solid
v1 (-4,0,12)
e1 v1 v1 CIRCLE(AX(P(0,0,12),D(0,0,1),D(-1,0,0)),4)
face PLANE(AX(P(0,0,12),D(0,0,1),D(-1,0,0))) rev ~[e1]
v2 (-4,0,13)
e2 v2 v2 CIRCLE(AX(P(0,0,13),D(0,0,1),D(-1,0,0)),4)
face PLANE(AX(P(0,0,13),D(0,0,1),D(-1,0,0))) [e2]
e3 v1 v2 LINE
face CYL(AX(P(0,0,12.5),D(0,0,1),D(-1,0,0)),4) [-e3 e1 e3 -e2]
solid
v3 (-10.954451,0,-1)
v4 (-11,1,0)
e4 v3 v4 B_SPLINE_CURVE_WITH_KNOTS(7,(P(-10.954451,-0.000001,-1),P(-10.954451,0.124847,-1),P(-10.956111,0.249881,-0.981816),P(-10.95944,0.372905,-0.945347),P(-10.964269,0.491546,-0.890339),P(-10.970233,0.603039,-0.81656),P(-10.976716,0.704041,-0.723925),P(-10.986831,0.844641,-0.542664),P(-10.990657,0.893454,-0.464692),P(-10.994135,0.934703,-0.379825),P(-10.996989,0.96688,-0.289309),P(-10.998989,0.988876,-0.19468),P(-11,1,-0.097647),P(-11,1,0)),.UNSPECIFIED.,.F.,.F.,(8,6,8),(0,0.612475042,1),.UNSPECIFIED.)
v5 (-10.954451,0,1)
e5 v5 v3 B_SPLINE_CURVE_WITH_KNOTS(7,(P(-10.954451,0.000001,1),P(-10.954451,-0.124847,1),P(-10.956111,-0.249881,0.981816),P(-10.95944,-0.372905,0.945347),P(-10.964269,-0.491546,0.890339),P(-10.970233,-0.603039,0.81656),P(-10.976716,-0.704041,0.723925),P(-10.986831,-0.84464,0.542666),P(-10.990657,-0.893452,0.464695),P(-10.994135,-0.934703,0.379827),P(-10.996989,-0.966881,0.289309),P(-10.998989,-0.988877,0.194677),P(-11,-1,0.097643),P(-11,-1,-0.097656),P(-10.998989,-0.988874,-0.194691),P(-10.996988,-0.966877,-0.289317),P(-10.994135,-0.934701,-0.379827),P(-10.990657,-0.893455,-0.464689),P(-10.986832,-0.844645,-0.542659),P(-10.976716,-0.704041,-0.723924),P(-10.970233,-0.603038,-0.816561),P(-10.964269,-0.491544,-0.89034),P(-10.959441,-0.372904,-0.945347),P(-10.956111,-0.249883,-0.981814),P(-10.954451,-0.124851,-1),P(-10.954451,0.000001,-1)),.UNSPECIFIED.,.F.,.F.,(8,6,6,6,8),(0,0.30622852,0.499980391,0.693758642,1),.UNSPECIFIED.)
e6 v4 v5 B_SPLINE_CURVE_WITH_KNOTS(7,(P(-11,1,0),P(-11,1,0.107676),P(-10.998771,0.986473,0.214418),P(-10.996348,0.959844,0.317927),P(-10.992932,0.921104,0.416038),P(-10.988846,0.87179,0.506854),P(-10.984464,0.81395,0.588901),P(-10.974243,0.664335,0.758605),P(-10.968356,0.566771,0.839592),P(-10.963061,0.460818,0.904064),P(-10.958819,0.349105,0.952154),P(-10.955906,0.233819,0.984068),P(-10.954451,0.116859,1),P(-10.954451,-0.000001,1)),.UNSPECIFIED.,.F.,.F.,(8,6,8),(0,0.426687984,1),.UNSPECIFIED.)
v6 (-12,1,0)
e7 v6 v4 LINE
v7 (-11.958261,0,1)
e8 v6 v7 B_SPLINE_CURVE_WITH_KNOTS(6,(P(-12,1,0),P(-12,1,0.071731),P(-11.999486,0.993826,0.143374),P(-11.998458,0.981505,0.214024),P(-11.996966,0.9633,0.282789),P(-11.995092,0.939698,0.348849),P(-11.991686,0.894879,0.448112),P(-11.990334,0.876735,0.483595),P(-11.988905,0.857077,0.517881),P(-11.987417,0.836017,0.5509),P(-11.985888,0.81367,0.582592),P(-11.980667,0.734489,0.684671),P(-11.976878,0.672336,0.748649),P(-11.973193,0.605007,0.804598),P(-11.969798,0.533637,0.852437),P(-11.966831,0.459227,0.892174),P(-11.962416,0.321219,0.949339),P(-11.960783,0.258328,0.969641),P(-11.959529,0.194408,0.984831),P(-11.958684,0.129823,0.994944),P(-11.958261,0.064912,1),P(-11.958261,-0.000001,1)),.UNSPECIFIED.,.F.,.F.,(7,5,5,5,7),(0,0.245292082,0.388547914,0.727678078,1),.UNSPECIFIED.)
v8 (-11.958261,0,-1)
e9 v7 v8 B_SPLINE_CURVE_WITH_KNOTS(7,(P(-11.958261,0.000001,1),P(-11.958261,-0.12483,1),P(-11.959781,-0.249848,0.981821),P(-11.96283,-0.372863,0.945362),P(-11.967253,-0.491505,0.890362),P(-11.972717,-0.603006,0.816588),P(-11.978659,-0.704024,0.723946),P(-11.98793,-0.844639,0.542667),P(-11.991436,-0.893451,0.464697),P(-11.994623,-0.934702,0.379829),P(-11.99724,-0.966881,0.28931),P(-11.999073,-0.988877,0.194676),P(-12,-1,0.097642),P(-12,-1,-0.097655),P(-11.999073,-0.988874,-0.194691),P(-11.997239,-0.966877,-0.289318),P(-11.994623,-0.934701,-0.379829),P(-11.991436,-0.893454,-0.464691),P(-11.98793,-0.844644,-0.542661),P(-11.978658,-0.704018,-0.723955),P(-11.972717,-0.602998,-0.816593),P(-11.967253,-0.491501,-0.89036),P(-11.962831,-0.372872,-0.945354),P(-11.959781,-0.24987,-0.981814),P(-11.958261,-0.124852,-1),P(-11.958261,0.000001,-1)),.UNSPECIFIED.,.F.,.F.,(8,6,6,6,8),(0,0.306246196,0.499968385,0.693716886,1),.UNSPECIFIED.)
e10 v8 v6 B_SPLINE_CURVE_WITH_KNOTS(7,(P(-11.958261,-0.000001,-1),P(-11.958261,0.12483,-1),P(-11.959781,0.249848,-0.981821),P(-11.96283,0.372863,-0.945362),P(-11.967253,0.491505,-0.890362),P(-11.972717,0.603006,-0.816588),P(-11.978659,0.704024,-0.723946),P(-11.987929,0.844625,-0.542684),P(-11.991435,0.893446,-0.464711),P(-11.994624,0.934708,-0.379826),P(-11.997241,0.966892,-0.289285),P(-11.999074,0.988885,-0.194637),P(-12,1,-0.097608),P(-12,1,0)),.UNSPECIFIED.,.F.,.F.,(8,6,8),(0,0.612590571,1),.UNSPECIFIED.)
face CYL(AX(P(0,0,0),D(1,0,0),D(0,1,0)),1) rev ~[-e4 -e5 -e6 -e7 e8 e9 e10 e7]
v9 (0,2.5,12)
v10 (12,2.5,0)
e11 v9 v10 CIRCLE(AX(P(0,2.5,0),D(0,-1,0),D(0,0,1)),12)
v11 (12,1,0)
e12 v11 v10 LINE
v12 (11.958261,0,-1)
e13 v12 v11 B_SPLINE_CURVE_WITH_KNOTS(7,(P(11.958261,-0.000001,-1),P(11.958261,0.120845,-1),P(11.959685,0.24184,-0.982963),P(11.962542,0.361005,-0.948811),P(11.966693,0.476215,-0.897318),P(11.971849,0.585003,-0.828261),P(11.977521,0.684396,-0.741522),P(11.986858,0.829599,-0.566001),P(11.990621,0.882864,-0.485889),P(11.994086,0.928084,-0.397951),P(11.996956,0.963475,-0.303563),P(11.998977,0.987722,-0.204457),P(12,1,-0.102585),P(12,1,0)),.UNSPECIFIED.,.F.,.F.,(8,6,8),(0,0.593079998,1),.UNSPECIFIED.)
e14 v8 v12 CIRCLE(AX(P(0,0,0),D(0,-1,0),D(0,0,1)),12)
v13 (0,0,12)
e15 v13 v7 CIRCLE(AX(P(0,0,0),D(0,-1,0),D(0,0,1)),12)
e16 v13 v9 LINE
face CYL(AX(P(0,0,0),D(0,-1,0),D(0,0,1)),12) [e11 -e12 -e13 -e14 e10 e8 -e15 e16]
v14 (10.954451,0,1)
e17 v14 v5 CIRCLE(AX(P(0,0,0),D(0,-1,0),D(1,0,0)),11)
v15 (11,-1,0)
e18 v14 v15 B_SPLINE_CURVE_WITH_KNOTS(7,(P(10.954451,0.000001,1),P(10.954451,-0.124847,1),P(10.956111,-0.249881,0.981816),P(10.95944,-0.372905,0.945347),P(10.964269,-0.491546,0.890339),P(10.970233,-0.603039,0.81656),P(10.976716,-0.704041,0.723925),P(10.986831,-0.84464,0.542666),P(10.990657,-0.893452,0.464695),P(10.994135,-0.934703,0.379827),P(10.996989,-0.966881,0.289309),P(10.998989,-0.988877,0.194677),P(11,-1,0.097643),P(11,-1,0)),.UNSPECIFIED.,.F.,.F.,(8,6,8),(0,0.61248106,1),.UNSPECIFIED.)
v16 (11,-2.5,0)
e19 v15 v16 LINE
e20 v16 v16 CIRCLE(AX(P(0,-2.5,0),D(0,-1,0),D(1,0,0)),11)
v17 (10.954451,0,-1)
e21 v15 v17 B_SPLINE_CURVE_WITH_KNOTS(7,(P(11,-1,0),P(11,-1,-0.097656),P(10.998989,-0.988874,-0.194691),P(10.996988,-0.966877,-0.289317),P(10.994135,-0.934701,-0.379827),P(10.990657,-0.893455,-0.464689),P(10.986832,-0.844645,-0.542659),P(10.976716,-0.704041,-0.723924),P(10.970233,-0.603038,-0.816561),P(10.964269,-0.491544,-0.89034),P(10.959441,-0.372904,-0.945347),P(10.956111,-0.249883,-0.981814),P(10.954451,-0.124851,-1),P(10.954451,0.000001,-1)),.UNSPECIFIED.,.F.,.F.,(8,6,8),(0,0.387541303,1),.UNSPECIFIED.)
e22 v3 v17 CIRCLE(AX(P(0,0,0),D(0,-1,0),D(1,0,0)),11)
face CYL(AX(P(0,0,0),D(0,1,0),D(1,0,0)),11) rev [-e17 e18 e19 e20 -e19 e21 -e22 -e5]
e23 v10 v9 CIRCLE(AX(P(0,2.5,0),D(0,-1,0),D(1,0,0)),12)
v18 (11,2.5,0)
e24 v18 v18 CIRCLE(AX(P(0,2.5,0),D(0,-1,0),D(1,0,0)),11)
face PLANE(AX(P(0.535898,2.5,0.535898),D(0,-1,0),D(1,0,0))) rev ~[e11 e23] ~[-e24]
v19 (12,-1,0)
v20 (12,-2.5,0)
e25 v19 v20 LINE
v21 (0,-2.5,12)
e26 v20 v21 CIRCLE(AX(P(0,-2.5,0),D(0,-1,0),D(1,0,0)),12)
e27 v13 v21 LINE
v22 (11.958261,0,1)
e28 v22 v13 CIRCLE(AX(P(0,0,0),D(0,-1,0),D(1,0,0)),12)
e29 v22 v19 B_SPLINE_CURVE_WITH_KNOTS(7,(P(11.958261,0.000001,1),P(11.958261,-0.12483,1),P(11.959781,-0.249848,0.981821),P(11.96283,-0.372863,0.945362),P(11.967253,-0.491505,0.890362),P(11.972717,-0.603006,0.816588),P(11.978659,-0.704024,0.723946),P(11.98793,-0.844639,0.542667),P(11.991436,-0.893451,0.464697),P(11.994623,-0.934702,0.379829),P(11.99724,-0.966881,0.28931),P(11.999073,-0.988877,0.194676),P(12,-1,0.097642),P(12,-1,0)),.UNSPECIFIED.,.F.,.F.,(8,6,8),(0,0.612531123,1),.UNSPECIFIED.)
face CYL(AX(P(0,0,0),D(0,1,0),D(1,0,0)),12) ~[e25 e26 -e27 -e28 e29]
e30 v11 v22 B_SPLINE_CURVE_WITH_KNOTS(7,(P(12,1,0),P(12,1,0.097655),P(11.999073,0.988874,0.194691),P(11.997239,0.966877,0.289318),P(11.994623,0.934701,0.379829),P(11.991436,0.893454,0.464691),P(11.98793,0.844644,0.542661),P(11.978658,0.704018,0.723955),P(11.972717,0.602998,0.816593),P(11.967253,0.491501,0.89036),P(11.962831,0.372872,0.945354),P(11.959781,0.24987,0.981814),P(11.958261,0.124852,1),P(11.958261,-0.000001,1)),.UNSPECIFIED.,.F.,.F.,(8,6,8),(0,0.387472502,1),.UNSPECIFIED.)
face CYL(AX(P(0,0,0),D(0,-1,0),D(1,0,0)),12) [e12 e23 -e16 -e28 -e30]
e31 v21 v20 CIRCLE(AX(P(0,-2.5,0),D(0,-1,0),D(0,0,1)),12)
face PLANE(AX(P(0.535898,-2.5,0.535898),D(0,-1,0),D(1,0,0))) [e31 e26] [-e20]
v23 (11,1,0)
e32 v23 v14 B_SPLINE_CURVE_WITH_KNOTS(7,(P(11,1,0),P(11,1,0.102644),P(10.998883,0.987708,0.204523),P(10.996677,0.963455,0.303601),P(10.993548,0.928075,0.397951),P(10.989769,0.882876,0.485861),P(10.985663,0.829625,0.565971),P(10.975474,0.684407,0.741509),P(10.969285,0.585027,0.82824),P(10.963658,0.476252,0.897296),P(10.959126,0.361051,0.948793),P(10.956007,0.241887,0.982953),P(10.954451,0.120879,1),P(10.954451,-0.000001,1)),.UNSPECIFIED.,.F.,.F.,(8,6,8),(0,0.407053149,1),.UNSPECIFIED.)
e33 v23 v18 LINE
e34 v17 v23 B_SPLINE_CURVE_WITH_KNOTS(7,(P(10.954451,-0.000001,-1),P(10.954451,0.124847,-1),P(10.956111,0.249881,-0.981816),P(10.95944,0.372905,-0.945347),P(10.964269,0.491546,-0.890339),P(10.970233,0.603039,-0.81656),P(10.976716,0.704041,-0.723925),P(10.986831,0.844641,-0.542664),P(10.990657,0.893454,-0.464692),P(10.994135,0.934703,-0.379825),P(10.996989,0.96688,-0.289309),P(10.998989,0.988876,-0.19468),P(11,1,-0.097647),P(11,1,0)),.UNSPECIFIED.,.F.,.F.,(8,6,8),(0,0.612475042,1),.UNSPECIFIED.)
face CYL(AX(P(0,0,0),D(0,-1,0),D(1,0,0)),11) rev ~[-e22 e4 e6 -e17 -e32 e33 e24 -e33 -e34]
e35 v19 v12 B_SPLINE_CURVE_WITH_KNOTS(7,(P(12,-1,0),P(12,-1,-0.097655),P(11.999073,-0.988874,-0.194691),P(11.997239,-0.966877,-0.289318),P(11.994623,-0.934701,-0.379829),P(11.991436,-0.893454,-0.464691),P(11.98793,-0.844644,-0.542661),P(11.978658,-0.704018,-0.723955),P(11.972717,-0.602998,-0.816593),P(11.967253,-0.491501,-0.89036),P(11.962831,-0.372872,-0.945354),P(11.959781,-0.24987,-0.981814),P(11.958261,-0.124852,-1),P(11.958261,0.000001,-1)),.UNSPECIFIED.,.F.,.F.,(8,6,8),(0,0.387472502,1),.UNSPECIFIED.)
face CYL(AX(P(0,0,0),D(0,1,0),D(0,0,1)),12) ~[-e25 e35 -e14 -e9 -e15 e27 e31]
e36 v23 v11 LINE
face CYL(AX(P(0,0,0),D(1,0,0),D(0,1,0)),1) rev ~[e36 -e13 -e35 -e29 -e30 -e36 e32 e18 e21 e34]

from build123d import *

# Parameters (mm, degrees)
F1_R     = 11
F2_DEPTH = 2.5
F1_W     = 4
F1_H     = 1
F4_R     = 1
F5_DEPTH = 30


with BuildPart() as f2:
    # F1 (on Front) → F2 (new body, symmetric)
    with BuildSketch(Plane.XZ):
        with BuildLine():
            ThreePointArc((0, 12), (-8.4852813742, -8.4852813742), (12, 0))
            ThreePointArc((12, 0), (8.4852813742, 8.4852813742), (0, 12))
        make_face()
        Circle(F1_R, mode=Mode.SUBTRACT)
    extrude(amount=F2_DEPTH, both=True)

    # F4 (on Right) → F5 (cut, symmetric)
    with BuildSketch(Plane.YZ):
        Circle(F4_R)
    extrude(amount=F5_DEPTH, both=True, mode=Mode.SUBTRACT)


with BuildPart() as f3:
    # F1 (on Front) → F3 (revolve)
    with BuildSketch(Plane.XZ):
        with Locations((-2, 12.5)):
            Rectangle(F1_W, F1_H)
    revolve(axis=Axis((0, 0, 12.5), (0, 0, 1)))


solid = Compound([f2.part, f3.part])
